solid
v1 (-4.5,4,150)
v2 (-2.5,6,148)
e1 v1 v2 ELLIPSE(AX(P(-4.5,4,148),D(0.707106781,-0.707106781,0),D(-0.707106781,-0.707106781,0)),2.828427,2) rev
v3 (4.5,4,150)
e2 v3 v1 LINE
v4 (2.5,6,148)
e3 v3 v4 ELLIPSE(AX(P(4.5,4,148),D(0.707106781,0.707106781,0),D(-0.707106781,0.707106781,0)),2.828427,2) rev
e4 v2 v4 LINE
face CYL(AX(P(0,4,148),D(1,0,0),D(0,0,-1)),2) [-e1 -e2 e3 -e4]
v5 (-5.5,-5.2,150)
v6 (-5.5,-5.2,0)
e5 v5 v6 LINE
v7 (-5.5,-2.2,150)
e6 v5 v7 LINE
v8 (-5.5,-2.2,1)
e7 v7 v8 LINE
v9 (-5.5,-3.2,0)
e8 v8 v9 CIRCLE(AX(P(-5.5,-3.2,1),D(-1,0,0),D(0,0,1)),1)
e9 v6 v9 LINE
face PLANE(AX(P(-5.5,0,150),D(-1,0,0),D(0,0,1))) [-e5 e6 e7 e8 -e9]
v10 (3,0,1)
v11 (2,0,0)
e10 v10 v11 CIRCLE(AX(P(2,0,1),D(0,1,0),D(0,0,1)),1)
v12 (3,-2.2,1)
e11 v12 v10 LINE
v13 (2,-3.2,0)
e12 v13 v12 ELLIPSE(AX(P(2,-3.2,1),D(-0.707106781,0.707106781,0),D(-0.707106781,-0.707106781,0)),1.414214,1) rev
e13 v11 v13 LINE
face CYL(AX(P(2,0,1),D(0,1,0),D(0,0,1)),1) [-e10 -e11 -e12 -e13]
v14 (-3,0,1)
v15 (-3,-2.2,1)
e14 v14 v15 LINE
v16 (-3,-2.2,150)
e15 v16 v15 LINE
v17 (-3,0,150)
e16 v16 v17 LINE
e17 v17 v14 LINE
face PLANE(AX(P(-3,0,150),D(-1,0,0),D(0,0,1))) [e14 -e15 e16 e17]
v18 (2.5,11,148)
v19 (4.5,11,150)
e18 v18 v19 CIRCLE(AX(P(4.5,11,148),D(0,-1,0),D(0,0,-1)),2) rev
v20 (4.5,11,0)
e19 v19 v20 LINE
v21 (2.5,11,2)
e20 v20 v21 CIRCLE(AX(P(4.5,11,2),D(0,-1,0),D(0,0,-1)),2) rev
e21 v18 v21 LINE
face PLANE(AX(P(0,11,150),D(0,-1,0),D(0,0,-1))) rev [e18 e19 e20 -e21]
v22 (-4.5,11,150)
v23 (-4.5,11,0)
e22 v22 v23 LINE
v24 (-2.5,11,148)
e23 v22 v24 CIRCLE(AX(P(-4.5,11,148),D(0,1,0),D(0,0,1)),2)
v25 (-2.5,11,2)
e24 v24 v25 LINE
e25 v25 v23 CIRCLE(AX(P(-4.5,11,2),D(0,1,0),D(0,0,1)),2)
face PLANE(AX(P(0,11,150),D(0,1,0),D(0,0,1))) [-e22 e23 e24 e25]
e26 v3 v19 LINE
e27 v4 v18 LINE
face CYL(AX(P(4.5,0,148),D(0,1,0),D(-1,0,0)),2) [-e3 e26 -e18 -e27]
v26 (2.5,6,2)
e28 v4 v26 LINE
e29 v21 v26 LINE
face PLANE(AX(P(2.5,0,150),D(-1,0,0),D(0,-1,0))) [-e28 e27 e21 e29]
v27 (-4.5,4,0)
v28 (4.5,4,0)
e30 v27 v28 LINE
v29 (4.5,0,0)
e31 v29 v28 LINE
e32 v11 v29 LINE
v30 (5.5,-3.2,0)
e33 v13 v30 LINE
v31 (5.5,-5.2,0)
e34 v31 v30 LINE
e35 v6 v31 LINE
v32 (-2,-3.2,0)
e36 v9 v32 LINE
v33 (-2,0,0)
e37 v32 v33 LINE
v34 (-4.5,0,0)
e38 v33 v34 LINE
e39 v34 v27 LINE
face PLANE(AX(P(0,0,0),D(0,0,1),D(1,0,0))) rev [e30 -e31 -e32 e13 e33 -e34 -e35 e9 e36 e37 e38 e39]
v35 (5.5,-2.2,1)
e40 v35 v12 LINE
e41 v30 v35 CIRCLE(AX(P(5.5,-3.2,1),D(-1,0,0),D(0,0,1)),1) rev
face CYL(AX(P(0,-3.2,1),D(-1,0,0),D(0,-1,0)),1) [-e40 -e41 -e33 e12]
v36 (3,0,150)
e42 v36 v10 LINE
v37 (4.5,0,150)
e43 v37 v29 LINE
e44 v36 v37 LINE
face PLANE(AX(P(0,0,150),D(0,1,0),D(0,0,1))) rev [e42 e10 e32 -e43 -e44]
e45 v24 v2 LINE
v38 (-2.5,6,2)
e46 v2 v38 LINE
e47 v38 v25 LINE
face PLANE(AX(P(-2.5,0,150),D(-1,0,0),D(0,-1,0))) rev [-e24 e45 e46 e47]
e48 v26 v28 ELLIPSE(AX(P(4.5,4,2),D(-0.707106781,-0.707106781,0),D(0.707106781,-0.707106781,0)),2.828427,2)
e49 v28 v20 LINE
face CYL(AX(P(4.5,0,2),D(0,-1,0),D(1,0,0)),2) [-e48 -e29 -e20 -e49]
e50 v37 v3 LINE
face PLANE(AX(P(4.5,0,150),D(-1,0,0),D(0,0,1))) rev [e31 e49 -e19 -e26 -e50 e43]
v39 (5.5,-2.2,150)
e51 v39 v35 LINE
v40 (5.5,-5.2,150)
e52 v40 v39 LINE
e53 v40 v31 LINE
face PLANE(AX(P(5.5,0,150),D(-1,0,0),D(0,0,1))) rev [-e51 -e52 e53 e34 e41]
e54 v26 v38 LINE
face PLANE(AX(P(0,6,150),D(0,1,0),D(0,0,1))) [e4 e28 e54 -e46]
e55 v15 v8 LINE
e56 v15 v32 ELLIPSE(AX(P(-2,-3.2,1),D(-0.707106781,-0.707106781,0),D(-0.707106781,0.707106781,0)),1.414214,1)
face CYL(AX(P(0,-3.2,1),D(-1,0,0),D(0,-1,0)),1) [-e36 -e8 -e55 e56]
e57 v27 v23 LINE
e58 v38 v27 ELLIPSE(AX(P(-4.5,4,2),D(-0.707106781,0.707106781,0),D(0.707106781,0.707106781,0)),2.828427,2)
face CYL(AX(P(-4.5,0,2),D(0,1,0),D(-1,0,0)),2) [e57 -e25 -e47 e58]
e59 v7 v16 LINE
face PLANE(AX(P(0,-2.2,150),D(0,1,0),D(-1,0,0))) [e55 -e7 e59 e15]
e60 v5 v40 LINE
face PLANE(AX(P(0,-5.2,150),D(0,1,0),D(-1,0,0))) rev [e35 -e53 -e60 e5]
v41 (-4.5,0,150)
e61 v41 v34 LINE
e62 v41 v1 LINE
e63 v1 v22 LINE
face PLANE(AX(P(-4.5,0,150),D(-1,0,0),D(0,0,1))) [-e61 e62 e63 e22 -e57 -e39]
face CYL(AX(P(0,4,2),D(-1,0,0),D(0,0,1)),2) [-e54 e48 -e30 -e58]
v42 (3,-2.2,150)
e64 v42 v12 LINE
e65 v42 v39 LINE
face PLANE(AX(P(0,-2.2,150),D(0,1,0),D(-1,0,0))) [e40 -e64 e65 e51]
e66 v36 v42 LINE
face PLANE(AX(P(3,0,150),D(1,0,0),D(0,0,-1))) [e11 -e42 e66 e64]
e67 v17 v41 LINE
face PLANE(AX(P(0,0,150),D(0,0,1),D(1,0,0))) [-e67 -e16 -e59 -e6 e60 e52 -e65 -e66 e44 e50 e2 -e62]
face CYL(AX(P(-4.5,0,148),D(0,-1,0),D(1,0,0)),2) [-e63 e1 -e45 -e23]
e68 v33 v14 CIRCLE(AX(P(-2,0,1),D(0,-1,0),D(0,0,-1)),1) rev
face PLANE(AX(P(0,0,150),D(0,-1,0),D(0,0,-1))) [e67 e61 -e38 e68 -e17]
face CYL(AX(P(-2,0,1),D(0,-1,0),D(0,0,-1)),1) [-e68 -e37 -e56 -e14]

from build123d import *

# Parameters (mm, degrees)
SKETCH_1_W      = 5
SKETCH_1_H      = 6
SKETCH_1_W_2    = 6
SKETCH_1_H_2    = 2.2
EXTRUDE_1_DEPTH = 150
FILLET_1_R      = 2
FILLET_2_R      = 1


with BuildPart() as part:
    # 스케치1 → 보스-돌출1 (new body)
    with BuildSketch(Plane.XY):
        Polygon((-4.5, 0), (-3, 0), (-2.5, 0), (-2.5, 6), (-2.5, 11), (-4.5, 11), align=None)
        with Locations((0, 3)):
            Rectangle(SKETCH_1_W, SKETCH_1_H)
        Polygon((2.5, 6), (2.5, 0), (3, 0), (4.5, 0), (4.5, 11), (2.5, 11), align=None)
        with Locations((0, -1.1)):
            Rectangle(SKETCH_1_W_2, SKETCH_1_H_2)
        Polygon((3, -2.2), (-3, -2.2), (-5.5, -2.2), (-5.5, -5.2), (5.5, -5.2), (5.5, -2.2), align=None)
    extrude(amount=EXTRUDE_1_DEPTH)

    # 필렛1
    fillet_1_edges = [part.edges().sort_by_distance(p)[0] for p in [
        (-2.5, 8.5, 0),
        (2.5, 8.5, 0),
        (-2.5, 8.5, 150),
        (2.5, 8.5, 150),
        (0, 6, 0),
        (0, 6, 150),
    ]]
    fillet(fillet_1_edges, radius=FILLET_1_R - 0.0001)  # a hair under: the kernel refuses the full size

    # 필렛2
    fillet_2_edges = [part.edges().sort_by_distance(p)[0] for p in [
        (4.25, -2.2, 0),
        (-4.25, -2.2, 0),
        (-3, -1.1, 0),
        (3, -1.1, 0),
    ]]
    fillet(fillet_2_edges, radius=FILLET_2_R)


solid = part.part
